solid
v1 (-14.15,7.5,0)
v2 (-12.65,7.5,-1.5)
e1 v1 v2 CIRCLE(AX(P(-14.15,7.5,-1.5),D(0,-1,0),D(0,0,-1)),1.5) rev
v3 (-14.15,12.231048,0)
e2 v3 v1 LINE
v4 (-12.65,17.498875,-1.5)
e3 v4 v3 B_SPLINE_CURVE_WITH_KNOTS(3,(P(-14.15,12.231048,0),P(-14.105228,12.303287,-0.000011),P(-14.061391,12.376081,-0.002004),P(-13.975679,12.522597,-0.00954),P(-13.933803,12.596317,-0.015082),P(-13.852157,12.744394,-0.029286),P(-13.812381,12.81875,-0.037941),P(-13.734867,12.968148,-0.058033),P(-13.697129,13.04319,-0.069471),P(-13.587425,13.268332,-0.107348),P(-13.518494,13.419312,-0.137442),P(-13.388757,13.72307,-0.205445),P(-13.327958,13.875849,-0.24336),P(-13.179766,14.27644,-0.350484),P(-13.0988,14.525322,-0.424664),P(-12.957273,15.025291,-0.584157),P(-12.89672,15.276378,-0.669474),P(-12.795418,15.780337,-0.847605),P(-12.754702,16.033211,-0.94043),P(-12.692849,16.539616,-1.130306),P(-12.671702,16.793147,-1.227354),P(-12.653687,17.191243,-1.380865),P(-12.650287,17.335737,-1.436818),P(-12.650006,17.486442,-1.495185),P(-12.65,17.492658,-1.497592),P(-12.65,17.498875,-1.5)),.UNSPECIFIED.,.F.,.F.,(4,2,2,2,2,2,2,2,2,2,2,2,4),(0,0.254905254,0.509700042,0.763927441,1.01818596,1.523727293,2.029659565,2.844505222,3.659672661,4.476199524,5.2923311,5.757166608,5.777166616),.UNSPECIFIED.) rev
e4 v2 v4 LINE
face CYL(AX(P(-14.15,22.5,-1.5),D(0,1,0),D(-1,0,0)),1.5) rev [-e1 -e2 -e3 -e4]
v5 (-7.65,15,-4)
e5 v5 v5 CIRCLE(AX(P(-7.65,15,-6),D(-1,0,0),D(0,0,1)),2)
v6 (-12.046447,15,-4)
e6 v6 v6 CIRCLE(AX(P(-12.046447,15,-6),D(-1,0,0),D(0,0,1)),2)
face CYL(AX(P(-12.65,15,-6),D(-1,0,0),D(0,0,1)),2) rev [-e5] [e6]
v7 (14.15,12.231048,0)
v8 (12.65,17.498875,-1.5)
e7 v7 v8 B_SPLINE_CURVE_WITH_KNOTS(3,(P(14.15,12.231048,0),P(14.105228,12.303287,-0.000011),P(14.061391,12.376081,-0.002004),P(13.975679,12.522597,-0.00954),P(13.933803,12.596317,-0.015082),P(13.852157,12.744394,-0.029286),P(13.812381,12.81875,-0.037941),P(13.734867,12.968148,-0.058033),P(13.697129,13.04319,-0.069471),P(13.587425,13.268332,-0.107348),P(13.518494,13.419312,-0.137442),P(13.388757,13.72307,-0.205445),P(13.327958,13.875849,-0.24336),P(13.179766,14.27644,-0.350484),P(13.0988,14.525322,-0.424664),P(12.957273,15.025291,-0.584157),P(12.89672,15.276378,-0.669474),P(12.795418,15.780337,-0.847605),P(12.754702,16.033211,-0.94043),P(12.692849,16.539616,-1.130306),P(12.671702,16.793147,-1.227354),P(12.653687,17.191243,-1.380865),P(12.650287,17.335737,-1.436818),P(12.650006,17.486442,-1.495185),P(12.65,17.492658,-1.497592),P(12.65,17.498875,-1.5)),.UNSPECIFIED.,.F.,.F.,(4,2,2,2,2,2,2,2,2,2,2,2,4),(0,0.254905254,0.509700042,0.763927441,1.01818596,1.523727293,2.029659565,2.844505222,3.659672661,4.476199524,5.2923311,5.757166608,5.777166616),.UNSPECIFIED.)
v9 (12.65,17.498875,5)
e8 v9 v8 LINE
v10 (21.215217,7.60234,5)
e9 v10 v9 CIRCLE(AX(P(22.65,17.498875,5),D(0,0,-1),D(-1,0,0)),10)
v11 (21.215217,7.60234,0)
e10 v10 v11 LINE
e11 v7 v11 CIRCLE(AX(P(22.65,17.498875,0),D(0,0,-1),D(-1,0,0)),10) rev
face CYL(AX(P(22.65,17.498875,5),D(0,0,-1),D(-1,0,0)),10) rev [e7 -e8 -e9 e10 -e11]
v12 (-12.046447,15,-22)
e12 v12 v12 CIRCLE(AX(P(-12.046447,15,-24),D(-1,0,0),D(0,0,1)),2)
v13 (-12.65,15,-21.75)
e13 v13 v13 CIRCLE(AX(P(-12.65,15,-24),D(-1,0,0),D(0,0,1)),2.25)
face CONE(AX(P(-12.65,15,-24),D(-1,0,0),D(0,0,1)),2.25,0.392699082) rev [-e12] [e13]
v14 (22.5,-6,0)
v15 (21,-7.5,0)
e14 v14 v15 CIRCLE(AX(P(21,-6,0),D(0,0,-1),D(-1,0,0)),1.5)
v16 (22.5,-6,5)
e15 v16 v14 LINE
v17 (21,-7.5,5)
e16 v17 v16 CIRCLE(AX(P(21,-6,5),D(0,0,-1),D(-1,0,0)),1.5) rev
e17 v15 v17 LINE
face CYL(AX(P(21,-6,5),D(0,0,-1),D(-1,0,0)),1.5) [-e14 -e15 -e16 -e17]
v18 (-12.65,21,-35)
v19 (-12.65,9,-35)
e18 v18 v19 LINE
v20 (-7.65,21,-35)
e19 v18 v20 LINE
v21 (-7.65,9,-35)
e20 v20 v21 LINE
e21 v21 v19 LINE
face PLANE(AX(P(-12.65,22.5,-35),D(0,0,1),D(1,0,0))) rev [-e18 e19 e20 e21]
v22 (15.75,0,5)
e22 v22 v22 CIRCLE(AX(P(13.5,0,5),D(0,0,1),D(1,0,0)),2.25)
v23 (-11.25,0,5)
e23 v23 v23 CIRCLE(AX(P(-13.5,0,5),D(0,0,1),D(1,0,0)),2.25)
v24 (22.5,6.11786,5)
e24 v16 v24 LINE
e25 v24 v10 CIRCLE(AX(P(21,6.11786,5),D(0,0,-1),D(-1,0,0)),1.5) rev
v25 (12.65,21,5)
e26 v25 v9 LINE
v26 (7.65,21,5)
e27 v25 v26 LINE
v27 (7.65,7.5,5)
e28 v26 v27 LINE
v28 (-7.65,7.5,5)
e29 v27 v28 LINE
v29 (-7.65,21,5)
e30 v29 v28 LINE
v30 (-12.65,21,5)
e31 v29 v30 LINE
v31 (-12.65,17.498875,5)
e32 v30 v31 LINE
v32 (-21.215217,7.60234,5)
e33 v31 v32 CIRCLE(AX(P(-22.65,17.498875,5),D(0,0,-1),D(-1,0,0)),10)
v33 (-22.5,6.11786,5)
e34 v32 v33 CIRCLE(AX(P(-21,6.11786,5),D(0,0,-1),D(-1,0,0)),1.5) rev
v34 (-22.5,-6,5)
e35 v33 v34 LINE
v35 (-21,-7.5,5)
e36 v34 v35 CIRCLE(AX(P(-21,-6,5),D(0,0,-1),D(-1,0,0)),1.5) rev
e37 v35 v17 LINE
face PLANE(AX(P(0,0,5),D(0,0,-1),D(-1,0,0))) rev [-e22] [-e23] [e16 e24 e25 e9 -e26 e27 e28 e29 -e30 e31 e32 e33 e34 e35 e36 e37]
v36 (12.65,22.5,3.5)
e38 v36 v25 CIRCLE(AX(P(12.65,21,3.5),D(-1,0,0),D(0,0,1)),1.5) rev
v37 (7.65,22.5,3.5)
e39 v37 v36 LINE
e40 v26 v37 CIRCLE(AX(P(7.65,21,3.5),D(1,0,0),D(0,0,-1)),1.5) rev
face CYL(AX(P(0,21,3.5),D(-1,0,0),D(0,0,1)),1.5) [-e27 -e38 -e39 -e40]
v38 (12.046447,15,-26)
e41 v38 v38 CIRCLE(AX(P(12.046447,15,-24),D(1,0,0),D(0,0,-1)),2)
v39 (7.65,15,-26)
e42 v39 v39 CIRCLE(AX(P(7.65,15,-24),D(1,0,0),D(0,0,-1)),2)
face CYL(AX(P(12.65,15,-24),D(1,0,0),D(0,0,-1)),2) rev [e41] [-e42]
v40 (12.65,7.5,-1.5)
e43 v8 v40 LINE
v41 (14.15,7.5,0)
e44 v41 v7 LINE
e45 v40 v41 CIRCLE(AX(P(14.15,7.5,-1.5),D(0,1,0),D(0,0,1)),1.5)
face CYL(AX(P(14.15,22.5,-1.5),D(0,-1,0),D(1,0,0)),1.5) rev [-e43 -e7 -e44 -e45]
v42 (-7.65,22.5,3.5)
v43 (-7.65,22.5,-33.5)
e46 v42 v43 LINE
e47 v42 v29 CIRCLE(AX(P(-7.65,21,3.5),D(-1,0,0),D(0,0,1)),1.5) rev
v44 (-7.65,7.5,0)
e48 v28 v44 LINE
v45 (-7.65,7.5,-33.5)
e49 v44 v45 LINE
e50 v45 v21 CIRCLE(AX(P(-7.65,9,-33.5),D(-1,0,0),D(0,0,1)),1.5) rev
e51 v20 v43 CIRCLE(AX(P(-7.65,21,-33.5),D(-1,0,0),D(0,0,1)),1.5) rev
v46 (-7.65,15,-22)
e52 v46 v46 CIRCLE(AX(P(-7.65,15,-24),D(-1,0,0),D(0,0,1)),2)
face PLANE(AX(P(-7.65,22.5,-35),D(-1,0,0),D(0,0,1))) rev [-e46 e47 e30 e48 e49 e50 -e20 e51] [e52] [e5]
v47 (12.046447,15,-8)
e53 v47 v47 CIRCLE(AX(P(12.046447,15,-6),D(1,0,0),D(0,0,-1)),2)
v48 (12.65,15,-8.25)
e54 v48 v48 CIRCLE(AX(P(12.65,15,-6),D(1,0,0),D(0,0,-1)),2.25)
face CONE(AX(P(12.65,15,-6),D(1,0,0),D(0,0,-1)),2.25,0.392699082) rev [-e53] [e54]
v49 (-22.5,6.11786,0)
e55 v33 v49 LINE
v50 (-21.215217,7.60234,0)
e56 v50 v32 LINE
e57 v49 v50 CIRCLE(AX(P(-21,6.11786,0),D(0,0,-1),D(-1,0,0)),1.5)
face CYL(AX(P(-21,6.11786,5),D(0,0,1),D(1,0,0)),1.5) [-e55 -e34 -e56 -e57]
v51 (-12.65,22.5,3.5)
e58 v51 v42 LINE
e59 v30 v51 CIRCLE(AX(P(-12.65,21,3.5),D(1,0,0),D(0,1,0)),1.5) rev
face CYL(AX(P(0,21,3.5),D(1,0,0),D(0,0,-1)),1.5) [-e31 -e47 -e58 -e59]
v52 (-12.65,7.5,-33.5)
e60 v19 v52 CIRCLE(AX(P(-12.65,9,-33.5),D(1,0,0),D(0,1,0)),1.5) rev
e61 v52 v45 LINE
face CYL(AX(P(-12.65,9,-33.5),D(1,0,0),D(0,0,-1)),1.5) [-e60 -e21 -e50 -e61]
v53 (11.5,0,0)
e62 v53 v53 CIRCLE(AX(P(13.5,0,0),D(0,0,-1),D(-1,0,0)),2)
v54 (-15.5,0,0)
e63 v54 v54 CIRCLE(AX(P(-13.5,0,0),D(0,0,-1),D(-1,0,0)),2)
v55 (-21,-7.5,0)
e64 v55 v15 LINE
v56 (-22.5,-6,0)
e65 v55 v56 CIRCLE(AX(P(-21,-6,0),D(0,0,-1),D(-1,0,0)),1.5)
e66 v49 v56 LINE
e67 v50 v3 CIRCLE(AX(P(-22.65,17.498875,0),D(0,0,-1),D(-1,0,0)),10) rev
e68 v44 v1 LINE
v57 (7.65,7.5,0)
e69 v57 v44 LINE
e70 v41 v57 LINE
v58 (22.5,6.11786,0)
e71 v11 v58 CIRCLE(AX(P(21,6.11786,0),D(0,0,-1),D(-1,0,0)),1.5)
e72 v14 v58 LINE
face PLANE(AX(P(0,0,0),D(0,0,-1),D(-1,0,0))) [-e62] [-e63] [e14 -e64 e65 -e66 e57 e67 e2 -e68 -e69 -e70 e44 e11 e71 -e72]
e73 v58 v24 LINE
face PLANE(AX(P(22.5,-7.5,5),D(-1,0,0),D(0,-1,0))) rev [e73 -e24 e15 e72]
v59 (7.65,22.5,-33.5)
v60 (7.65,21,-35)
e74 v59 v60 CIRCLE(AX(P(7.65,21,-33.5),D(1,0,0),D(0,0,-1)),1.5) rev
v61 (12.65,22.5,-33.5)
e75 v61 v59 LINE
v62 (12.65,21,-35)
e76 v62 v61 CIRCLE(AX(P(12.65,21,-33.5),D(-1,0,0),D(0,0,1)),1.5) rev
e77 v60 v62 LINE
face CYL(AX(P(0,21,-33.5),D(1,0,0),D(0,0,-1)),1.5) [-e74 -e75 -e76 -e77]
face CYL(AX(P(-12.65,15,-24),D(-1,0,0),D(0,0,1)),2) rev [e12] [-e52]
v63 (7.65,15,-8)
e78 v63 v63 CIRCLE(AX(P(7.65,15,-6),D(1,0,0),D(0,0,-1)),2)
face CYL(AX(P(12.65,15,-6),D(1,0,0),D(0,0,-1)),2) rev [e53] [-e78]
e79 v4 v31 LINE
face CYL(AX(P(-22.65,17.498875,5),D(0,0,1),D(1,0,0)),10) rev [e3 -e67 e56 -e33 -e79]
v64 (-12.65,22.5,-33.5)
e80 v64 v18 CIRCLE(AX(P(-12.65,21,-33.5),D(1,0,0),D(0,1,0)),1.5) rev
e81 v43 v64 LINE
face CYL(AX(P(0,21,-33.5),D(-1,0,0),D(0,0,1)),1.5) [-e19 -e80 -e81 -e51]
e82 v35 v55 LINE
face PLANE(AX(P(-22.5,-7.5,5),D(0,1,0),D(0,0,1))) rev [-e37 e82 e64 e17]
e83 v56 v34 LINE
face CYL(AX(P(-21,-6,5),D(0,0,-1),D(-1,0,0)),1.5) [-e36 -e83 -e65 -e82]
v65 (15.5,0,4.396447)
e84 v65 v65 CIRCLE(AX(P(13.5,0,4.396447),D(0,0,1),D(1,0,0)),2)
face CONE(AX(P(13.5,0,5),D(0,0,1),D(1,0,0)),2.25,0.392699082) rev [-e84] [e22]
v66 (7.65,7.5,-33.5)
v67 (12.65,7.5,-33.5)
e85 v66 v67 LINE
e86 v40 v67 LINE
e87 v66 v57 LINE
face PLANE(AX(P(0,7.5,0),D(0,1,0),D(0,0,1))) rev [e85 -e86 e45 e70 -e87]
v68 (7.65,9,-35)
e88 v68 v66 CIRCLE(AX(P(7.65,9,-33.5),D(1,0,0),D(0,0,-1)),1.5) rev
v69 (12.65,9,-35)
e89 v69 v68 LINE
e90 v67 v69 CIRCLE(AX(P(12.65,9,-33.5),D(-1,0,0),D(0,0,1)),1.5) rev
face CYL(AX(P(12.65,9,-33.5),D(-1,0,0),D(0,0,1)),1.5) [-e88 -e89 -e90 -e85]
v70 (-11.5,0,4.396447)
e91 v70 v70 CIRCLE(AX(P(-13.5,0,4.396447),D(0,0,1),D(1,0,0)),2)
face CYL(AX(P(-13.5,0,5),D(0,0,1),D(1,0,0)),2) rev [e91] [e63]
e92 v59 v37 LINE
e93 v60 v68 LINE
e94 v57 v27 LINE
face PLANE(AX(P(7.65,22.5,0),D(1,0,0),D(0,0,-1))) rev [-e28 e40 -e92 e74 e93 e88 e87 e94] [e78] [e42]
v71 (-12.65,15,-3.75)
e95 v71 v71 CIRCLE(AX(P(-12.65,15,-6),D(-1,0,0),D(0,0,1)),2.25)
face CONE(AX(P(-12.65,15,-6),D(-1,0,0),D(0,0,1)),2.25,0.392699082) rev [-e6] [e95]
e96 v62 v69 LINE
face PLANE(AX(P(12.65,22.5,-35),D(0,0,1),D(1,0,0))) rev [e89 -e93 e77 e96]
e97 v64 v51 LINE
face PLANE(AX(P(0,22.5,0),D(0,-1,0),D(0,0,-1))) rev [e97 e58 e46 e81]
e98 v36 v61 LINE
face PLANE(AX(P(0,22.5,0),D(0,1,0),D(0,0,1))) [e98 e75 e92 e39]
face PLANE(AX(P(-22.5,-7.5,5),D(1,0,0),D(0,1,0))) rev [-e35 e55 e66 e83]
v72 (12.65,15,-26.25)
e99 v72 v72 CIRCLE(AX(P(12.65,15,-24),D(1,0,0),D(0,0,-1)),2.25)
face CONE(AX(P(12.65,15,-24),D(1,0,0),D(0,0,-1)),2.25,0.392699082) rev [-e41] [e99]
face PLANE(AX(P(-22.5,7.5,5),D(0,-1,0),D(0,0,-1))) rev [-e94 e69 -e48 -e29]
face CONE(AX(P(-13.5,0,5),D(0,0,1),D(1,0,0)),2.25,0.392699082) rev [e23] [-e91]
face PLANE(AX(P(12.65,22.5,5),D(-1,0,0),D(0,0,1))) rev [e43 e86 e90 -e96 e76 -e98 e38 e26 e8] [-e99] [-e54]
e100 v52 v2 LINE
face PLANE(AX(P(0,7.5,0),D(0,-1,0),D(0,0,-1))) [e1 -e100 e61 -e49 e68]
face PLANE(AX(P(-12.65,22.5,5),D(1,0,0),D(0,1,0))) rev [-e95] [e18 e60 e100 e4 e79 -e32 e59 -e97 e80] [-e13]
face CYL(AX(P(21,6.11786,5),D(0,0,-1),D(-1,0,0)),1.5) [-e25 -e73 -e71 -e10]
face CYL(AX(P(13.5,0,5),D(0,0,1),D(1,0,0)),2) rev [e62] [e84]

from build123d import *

# Parameters (mm, degrees)
SKETCH1_W                         = 45
SKETCH1_H                         = 15
BOSS_EXTRUDE1_DEPTH               = 5
BOSS_EXTRUDE2_DEPTH               = 15
F_4_0_4_DIAMETER_HOLE1_AT_2_COUNT = 2
F_4_0_4_DIAMETER_HOLE1_AT_2_PITCH = 18
F_4_0_4_DIAMETER_HOLE2_AT_2_COUNT = 2
F_4_0_4_DIAMETER_HOLE2_AT_2_PITCH = 27
FILLET1_R                         = 10
FILLET2_R                         = 1.5


with BuildPart() as part:
    # Sketch1 → Boss-Extrude1 (new body)
    with BuildSketch(Plane.XY):
        Rectangle(SKETCH1_W, SKETCH1_H)
    extrude(amount=BOSS_EXTRUDE1_DEPTH)

    # Sketch3 → Boss-Extrude2 (add)
    with BuildSketch(Plane(origin=(0, 7.5, 0), x_dir=(1, 0, 0), z_dir=(0, 1, 0))):
        Polygon((-7.65, 0), (-7.65, -5), (-12.65, -5), (-12.65, 35), (-7.65, 35), align=None)
        Polygon((7.65, -5), (12.65, -5), (12.65, 35), (7.65, 35), (7.65, 0), align=None)
    extrude(amount=BOSS_EXTRUDE2_DEPTH)

    # Sketch8 → Ø4.0 (4) Diameter Hole1 (revolve, cut)
    with BuildSketch(Plane(origin=(-12.65, 15, -24), x_dir=(0, 0, 1), z_dir=(0, 1, 0))):
        Polygon((0, 0), (0, 5), (2, 5), (2, 0.603553391), (2.25, 0), align=None)
    f_4_0_4_diameter_hole1 = revolve(axis=Axis((-19, 15, -24), (1, 0, 0)), mode=Mode.SUBTRACT)

    # Ø4.0 (4) Diameter Hole1 at 2: Ø4.0 (4) Diameter Hole1 ×2
    with Locations(*[(0, 0, i * F_4_0_4_DIAMETER_HOLE1_AT_2_PITCH) for i in range(1, F_4_0_4_DIAMETER_HOLE1_AT_2_COUNT)]):
        add(f_4_0_4_diameter_hole1, mode=Mode.SUBTRACT)

    # Mirror3: Ø4.0 (4) Diameter Hole1 across plane
    add(f_4_0_4_diameter_hole1.mirror(Plane(origin=(0, 0, 0), x_dir=(0, 0, 1), z_dir=(1, 0, 0))), mode=Mode.SUBTRACT)

    # Mirror3 copy 1 sketch → Mirror3 copy 1 (revolve, cut)
    with BuildSketch(Plane(origin=(12.65, 15, -6), x_dir=(0, 0, 1), z_dir=(0, 1, 0))):
        Polygon((0, 0), (0, -5), (2, -5), (2, -0.603553391), (2.25, 0), align=None)
    revolve(axis=Axis((19, 15, -6), (1, 0, 0)), mode=Mode.SUBTRACT)

    # Sketch12 → Ø4.0 (4) Diameter Hole2 (revolve, cut)
    with BuildSketch(Plane(origin=(13.5, 0, 5), x_dir=(0, -1, 0), z_dir=(1, 0, 0))):
        Polygon((0, 0), (0, 5), (2, 5), (2, 0.603553391), (2.25, 0), align=None)
    f_4_0_4_diameter_hole2 = revolve(axis=Axis((13.5, 0, 11.35), (0, 0, -1)), mode=Mode.SUBTRACT)

    # Ø4.0 (4) Diameter Hole2 at 2: Ø4.0 (4) Diameter Hole2 ×2
    with Locations(*[(-i * F_4_0_4_DIAMETER_HOLE2_AT_2_PITCH, 0, 0) for i in range(1, F_4_0_4_DIAMETER_HOLE2_AT_2_COUNT)]):
        add(f_4_0_4_diameter_hole2, mode=Mode.SUBTRACT)

    # Fillet1
    # the kernel refuses this fillet: 10 mm, written as the material it adds along each edge
    with BuildSketch(Plane(origin=(12.65, 7.5, 5), x_dir=(1, 0, 0), z_dir=(0, 0, -1))) as fillet1_piece_1:
        with BuildLine():
            CenterArc((10, -9.998874937), FILLET1_R, 90.859468925, 89.140531075)
            Line((0, -9.998874937), (0, 0))
            Line((0, 0), (9.85, 0))
        make_face()
    extrude(amount=5)
    with BuildSketch(Plane(origin=(-12.65, 7.5, 5), x_dir=(-1, 0, 0), z_dir=(0, 0, -1))) as fillet1_piece_2:
        with BuildLine():
            CenterArc((10, 9.998874937), FILLET1_R, 180, 89.140531075)
            Line((0, 9.998874937), (0, 0))
            Line((0, 0), (9.85, 0))
        make_face()
    extrude(amount=5)

    # Fillet2
    fillet2_edges = [part.edges().sort_by_distance(p)[0] for p in [
        (-10.15, 7.5, -35),
        (-10.15, 22.5, -35),
        (-10.15, 22.5, 5),
        (10.15, 7.5, -35),
        (10.15, 22.5, 5),
        (10.15, 22.5, -35),
        (22.5, -7.5, 2.5),
        (-22.5, -7.5, 2.5),
        (-22.5, 7.5, 2.5),
        (22.5, 7.5, 2.5),
        (12.65, 12.499437468, 0),
        (-12.65, 12.499437468, 0),
    ]]
    fillet(fillet2_edges, radius=FILLET2_R)


solid = part.part
